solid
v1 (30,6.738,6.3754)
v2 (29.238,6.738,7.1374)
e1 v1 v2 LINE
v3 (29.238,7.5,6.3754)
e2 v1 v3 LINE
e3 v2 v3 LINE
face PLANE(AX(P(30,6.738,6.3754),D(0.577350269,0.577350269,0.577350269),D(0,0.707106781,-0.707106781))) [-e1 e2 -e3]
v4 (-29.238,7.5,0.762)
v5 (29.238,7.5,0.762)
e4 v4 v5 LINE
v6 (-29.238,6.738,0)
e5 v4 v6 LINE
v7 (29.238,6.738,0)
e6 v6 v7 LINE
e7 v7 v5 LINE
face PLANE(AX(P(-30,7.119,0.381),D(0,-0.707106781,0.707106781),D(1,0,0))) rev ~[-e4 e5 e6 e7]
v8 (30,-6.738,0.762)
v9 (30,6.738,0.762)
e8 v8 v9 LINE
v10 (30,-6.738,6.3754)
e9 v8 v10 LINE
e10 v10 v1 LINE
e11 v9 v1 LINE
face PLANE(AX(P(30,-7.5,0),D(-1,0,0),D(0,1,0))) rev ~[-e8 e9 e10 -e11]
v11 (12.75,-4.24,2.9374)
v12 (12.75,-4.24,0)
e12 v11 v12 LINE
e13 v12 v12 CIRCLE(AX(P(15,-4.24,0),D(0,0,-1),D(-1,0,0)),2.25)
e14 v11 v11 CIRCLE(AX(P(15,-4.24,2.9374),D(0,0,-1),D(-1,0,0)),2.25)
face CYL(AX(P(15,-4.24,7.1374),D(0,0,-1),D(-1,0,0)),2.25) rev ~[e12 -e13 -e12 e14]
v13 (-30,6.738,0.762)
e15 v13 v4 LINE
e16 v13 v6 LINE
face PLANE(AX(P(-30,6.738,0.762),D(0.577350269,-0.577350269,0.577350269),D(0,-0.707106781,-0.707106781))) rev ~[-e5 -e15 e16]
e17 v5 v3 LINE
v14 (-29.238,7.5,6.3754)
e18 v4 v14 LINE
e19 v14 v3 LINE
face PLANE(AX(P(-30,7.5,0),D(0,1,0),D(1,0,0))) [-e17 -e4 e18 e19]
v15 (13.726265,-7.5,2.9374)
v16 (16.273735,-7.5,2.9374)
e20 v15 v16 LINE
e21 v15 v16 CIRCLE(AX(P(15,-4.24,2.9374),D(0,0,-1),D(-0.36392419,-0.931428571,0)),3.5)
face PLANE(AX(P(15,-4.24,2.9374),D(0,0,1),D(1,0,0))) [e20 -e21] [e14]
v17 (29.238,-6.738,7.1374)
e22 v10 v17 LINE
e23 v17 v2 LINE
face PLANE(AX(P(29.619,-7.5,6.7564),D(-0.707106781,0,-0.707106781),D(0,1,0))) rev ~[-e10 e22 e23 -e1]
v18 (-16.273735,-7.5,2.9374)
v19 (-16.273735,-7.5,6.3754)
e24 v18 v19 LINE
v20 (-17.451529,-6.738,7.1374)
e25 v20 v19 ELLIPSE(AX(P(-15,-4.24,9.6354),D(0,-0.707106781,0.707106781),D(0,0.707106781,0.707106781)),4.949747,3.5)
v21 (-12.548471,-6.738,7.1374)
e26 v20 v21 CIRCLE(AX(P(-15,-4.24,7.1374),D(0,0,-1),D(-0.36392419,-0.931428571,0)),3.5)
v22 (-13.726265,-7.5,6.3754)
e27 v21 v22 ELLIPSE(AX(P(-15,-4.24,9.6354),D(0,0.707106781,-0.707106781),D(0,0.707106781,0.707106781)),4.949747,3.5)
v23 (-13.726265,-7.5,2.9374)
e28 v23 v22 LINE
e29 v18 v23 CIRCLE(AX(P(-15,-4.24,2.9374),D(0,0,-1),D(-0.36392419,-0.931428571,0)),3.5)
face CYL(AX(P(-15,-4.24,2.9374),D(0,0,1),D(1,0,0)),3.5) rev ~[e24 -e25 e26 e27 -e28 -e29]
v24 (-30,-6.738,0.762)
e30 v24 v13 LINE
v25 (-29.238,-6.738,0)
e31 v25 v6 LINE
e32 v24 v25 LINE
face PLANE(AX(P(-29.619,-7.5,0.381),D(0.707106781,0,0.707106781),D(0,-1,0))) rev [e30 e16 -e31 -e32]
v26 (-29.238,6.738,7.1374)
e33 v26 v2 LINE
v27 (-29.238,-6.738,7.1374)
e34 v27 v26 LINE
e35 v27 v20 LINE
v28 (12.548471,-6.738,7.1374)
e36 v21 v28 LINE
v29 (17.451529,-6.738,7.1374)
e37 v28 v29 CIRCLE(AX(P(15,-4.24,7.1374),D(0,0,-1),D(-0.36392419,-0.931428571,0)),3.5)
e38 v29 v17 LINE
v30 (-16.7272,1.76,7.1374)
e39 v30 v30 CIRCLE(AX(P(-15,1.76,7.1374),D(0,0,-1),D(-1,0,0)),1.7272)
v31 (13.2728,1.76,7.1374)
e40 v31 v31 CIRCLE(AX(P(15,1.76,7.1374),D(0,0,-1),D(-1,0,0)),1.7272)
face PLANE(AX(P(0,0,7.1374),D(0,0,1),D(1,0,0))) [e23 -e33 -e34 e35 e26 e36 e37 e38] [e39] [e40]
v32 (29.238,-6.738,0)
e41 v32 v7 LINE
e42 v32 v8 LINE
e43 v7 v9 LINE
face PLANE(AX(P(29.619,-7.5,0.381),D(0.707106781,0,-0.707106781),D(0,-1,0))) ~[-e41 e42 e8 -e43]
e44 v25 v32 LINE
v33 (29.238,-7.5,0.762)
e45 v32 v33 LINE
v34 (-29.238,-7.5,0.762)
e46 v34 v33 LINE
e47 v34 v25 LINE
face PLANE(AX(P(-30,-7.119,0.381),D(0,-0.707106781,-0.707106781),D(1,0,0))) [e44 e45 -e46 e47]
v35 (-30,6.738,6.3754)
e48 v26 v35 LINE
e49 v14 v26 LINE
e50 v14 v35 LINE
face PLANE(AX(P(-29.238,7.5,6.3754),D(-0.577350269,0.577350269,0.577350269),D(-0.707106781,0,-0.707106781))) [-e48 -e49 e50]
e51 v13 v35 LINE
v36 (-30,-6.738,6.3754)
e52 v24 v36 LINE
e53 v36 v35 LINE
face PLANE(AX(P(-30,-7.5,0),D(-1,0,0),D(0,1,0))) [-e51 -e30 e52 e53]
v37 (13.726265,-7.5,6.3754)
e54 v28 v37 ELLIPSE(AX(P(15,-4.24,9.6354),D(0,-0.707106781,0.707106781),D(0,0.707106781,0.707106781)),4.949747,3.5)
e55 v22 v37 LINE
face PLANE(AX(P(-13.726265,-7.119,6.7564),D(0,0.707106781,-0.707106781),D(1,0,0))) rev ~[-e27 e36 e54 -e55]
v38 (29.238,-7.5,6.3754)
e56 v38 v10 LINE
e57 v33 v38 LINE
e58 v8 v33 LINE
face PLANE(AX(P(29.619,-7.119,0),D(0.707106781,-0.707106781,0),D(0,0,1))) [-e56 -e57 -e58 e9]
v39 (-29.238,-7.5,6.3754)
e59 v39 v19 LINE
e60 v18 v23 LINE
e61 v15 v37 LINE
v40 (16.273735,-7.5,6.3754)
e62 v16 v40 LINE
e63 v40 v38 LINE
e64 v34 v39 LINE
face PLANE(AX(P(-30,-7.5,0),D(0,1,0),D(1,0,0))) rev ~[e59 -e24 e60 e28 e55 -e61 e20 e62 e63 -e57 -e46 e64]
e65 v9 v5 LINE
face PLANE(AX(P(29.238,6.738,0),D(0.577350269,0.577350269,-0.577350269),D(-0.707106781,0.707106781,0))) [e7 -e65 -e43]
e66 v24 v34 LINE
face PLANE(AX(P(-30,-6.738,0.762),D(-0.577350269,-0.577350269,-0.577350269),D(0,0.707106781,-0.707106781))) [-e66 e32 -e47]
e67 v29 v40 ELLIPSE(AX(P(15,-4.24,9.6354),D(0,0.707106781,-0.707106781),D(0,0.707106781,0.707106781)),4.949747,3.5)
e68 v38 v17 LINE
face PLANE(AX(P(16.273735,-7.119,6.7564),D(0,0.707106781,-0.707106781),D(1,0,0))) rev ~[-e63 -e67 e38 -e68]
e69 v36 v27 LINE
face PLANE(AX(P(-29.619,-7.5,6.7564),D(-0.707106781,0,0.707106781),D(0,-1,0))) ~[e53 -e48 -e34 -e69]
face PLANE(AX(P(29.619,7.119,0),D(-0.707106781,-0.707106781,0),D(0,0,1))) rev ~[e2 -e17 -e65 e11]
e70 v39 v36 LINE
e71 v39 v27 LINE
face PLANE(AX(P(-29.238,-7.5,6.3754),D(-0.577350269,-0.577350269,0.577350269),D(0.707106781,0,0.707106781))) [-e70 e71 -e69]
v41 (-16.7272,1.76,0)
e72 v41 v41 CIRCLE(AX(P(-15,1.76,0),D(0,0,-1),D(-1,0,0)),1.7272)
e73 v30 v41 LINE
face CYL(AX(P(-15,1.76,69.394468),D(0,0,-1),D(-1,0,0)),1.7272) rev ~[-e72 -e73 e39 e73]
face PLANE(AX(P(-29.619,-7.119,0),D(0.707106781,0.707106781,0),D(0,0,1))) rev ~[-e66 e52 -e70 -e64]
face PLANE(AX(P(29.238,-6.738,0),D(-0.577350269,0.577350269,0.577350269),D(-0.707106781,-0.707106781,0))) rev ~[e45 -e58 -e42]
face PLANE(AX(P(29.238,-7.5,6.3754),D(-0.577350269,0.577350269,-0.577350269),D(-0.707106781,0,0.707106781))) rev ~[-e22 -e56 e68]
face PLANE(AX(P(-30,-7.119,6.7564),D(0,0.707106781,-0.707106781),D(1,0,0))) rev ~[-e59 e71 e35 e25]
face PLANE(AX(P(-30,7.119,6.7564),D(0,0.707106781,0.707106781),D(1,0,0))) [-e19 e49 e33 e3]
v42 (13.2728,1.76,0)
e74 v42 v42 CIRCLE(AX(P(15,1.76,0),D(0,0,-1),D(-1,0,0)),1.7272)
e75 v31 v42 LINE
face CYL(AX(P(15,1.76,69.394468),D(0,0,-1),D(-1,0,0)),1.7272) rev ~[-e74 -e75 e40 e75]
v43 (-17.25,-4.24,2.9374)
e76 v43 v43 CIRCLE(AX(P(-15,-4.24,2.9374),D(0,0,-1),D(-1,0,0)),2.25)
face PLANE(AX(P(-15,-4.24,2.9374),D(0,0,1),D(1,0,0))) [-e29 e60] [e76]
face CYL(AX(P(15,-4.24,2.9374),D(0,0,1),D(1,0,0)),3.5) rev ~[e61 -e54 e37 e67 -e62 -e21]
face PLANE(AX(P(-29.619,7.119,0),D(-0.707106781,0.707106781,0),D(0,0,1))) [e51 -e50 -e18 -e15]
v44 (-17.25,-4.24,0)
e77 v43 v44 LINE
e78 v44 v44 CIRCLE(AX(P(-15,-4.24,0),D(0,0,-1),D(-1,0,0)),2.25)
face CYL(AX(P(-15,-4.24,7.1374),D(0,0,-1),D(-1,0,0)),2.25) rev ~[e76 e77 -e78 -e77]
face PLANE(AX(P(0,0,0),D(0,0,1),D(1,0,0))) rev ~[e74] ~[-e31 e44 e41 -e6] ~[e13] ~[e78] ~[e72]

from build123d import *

# Parameters (mm, degrees)
F0_W           = 60
F0_H           = 15
F1_DEPTH       = 7.1374
F3_D           = 3.4544
F4_D           = 4.5
F4_CBORE_D     = 7
F4_CBORE_DEPTH = 4.2
F5_SIZE        = 0.762


with BuildPart() as f1:
    # F0 (on Top) → F1 (new body)
    with BuildSketch(Plane.XY):
        Rectangle(F0_W, F0_H)
    extrude(amount=F1_DEPTH)

    # F3 (through all)
    with Locations(Plane.XY.offset(7.1374)):
        with Locations((-15, 1.76), (15, 1.76)):
            Hole(F3_D / 2)

    # F4 (through all)
    with Locations(Plane.XY.offset(7.1374)):
        with Locations((-15, -4.24), (15, -4.24)):
            CounterBoreHole(F4_D / 2, F4_CBORE_D / 2, F4_CBORE_DEPTH)

    # F5
    f5_edges = [f1.edges().sort_by_distance(p)[0] for p in [
        (0, -7.5, 7.1374),
        (-30, 0, 7.1374),
        (0, 7.5, 7.1374),
        (30, 0, 7.1374),
        (30, -7.5, 3.5687),
        (30, 7.5, 3.5687),
        (30, 0, 0),
        (0, 7.5, 0),
        (-30, 7.5, 3.5687),
        (0, -7.5, 0),
        (-30, -7.5, 3.5687),
        (-30, 0, 0),
        (23.136867, -7.5, 7.1374),
        (-23.136867, -7.5, 7.1374),
    ]]
    chamfer(f5_edges, length=F5_SIZE)


solid = f1.part
